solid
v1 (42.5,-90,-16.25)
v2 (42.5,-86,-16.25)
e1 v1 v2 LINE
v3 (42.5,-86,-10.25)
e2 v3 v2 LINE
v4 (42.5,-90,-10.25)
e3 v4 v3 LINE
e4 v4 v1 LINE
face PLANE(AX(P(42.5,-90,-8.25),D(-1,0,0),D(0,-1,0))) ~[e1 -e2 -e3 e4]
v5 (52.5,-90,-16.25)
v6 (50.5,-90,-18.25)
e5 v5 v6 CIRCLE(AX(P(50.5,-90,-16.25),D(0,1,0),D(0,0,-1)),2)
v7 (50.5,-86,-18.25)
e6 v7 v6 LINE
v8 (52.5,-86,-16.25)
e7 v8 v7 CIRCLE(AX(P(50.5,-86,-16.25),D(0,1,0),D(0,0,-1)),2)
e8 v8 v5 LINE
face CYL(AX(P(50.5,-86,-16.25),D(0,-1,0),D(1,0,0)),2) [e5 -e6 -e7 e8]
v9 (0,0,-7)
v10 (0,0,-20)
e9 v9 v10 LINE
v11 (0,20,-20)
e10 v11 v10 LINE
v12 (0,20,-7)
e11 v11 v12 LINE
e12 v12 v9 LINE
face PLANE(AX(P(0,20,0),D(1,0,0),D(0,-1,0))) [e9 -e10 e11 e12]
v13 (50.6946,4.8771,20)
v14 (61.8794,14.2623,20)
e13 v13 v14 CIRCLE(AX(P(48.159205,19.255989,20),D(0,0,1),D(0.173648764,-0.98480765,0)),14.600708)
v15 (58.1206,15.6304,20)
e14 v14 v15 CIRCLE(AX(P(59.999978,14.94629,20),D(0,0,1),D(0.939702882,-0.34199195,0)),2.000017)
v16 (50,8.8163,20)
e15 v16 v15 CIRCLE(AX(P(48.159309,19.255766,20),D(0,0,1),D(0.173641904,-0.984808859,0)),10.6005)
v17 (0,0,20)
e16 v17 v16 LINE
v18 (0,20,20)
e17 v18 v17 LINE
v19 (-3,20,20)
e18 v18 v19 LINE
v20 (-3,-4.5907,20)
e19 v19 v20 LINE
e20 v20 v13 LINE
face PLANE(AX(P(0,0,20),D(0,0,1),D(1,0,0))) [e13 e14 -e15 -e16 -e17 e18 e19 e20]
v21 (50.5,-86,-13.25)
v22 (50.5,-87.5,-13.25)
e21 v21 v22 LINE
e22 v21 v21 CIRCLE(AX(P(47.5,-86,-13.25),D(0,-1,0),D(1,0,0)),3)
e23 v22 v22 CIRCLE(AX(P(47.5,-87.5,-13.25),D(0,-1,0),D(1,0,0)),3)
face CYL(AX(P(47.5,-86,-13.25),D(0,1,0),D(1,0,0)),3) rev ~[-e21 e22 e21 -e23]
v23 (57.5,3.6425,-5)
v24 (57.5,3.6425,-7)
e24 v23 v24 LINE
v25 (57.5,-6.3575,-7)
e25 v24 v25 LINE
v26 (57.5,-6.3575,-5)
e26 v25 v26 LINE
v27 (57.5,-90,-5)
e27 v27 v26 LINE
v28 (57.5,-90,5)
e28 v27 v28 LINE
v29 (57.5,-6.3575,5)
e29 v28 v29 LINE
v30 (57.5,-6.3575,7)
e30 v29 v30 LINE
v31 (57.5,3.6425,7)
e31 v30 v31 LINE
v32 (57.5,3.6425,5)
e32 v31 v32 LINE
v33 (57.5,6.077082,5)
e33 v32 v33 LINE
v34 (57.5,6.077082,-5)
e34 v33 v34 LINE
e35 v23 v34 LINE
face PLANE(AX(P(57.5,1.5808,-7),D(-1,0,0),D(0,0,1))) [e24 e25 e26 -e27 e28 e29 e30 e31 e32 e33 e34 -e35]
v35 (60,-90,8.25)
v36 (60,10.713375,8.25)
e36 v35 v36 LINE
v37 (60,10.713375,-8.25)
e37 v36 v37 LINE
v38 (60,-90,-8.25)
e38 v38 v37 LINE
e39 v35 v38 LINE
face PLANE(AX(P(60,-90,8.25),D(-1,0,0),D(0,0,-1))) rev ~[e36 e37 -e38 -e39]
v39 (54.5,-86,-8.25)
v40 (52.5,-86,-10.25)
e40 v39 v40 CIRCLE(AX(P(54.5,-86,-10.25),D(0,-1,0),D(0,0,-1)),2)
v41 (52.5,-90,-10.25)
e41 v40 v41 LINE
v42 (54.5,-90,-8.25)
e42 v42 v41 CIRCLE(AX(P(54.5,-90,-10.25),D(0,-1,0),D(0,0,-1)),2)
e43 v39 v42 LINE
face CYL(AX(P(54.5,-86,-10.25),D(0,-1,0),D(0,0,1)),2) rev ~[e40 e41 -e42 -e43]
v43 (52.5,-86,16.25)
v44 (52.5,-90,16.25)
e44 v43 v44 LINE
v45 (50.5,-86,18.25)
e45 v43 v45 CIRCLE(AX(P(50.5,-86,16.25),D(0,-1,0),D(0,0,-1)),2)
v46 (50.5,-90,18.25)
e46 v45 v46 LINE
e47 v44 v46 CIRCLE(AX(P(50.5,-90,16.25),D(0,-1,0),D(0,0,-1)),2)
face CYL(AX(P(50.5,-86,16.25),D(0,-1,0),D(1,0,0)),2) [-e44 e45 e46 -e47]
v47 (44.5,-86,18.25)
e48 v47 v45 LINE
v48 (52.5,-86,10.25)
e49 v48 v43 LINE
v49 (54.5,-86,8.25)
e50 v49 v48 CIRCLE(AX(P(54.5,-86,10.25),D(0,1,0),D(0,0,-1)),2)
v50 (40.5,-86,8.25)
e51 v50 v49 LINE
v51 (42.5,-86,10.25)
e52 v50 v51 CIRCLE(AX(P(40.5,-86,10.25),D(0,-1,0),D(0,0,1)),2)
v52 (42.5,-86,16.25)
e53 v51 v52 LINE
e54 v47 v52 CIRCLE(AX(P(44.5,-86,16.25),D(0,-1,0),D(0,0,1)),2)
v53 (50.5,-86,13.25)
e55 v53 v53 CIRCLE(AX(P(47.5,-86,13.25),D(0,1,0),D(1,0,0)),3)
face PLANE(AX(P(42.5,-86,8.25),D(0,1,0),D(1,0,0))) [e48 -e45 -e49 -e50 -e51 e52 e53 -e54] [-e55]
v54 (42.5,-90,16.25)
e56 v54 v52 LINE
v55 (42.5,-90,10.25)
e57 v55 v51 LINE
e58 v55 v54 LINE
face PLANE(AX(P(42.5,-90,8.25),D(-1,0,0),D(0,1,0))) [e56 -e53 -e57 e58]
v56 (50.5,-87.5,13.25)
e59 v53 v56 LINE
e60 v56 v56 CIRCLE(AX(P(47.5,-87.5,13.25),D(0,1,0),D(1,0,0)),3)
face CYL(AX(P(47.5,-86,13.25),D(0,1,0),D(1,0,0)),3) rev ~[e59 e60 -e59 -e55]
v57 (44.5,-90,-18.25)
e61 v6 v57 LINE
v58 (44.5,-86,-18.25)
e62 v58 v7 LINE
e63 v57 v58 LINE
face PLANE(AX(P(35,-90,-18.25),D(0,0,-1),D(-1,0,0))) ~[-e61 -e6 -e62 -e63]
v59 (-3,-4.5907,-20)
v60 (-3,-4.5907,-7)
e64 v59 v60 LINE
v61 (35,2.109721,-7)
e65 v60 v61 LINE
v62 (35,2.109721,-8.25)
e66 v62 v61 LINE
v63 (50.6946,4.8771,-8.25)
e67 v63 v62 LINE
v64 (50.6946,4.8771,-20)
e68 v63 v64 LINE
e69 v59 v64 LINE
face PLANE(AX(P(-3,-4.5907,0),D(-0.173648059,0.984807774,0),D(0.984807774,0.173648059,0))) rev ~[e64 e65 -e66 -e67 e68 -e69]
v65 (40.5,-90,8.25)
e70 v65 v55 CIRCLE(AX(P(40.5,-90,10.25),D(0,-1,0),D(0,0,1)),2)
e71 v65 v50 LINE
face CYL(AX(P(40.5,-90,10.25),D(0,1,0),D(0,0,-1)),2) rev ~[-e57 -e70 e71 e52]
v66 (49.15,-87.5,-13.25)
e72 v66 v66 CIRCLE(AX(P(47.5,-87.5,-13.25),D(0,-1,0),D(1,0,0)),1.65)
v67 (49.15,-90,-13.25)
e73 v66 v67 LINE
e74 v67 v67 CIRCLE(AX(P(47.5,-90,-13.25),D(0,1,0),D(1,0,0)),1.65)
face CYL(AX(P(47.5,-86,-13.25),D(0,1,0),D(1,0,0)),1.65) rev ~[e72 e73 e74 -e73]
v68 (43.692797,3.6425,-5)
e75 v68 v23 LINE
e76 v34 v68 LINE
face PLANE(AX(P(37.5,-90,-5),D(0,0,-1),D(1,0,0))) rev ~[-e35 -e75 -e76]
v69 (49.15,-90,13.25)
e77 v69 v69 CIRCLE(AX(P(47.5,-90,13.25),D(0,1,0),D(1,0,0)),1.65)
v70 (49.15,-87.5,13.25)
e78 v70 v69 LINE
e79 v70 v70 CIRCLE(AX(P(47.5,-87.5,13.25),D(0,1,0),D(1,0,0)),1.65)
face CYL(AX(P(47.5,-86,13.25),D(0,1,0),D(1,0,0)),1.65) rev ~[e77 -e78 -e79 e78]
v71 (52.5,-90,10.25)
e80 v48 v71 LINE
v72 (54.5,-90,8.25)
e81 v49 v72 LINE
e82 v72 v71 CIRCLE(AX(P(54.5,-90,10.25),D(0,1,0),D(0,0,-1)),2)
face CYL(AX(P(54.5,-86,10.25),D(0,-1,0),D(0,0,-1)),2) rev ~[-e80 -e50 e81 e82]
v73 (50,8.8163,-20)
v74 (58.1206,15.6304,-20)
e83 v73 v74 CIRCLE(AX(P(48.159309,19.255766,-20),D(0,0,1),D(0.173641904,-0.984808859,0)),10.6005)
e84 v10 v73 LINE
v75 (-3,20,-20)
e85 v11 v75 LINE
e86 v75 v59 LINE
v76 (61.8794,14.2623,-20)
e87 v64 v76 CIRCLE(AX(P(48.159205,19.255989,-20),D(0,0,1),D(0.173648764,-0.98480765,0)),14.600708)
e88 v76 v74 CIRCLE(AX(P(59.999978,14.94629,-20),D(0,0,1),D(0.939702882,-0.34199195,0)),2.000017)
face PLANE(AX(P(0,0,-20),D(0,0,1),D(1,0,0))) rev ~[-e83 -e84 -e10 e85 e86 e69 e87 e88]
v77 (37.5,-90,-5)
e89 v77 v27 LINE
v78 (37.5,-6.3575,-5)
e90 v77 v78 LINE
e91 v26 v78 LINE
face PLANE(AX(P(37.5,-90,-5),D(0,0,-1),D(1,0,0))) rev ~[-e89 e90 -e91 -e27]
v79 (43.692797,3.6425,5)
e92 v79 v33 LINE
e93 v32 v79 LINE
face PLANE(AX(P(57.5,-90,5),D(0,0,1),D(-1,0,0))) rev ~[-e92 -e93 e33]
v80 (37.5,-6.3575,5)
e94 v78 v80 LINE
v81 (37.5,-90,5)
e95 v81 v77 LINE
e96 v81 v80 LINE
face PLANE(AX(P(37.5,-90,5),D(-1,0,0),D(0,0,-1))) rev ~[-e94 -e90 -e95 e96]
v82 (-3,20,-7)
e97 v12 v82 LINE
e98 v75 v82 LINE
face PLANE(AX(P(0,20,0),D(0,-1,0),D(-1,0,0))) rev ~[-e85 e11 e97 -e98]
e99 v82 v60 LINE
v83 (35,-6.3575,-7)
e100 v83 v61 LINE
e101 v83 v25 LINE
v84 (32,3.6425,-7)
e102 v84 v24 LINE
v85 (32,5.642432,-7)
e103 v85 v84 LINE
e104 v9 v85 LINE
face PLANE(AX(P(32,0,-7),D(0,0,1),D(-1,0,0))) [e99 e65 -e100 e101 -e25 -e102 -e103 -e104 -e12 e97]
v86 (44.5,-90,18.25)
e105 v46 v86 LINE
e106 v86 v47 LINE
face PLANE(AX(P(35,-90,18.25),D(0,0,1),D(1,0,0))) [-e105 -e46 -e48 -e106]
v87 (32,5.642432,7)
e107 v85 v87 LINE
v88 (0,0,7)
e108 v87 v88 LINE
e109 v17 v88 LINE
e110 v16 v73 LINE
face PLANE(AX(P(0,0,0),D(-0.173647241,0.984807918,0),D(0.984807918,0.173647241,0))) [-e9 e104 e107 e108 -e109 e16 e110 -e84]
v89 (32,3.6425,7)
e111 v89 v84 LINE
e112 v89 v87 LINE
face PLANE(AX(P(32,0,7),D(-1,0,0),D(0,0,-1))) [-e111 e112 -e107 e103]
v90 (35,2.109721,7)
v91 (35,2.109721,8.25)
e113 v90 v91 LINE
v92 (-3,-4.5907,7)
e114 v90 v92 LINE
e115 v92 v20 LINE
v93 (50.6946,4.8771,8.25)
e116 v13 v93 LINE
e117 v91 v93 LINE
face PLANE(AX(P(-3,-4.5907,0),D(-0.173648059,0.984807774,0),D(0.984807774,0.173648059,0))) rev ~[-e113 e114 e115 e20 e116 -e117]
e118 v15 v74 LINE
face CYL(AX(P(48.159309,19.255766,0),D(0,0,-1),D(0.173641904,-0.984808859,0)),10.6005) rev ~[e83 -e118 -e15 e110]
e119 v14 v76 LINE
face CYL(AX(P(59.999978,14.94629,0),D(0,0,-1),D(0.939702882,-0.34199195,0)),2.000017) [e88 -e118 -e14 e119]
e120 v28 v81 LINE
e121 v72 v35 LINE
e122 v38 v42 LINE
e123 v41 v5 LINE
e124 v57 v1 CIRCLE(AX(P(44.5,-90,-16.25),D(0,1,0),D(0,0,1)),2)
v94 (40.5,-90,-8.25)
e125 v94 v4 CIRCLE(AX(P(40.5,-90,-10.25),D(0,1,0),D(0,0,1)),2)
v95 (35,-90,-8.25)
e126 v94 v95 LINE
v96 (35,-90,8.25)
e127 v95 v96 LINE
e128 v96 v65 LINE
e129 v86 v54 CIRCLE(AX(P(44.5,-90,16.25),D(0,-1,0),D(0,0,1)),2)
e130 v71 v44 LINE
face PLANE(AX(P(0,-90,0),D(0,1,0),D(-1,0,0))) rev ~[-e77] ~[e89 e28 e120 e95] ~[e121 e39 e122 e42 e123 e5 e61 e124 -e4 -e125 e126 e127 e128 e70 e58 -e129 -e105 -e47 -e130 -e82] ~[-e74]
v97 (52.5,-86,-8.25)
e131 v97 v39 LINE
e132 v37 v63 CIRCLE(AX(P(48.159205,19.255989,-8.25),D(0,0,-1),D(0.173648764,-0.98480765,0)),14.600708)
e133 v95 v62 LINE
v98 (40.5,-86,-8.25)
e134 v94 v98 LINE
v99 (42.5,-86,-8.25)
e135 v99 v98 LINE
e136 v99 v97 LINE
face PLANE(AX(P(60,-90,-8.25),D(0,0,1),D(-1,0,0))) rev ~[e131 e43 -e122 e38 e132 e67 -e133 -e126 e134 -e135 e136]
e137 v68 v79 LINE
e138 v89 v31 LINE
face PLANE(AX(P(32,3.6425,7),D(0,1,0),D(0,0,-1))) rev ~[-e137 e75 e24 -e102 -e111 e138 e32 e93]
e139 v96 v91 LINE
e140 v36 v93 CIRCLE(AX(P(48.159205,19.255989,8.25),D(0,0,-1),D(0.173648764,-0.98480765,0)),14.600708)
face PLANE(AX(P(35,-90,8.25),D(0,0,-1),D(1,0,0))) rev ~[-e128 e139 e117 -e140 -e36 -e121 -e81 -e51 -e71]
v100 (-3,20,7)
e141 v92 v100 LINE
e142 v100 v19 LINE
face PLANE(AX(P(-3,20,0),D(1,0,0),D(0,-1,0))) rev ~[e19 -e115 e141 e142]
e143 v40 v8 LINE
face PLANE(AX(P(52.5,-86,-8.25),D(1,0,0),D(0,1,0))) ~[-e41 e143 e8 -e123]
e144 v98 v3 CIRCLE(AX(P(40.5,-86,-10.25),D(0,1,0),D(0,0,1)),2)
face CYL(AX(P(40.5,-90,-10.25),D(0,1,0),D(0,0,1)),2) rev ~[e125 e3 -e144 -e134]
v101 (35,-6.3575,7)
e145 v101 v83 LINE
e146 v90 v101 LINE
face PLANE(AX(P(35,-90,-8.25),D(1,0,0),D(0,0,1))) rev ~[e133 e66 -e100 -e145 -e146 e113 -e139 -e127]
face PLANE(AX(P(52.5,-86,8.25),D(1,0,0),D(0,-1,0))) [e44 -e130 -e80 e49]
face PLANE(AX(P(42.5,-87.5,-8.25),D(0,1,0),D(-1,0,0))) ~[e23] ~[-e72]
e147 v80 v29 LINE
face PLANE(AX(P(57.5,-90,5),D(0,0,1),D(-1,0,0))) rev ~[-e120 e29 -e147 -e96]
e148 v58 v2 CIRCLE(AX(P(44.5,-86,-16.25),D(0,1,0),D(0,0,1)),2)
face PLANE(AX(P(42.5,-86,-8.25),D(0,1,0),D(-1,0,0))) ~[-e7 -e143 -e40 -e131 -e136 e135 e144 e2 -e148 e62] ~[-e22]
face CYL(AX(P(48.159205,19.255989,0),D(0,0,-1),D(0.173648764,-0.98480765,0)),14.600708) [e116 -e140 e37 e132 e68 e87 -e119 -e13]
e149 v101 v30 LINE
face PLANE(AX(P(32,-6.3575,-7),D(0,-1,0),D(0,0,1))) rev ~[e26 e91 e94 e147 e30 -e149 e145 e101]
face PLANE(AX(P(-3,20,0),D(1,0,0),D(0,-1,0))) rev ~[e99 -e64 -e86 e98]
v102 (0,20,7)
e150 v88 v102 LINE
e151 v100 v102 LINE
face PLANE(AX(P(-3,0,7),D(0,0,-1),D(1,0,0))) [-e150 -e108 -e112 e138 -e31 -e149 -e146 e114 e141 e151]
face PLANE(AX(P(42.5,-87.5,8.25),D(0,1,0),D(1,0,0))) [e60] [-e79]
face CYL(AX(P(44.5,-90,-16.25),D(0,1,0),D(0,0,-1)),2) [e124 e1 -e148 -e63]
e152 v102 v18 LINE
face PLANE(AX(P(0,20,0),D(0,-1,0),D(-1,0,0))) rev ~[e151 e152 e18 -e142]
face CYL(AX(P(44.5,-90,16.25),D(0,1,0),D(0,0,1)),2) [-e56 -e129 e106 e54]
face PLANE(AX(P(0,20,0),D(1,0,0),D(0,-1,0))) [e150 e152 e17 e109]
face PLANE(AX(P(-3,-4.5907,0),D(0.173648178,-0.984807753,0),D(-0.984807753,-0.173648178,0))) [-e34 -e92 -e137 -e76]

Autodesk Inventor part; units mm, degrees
ref_plane "YZ Plane" through (0, 0, 0) normal (1, 0, 0) x (0, 1, 0)
sketch "Sketch1" plane through (0, 0, 0) normal (0, 0, 1) x (1, 0, 0)
  line L0 (0, 20) -> (0, 0)
  line L1 (0, 0) -> (50, 8.8163)
  arc A0 (50, 8.8163) -> (58.1206, 15.6304) centre (48.1592, 19.256) ccw
  line L2 (0, 0) -> (58.1206, 0) construction
  line L3 (58.1206, 15.6304) -> (52.4316, 0) construction
  line L4 (0, 20) -> (-3, 20)
  line L5 (-3, 20) -> (-3, -4.5907)
  line L6 (-3, -4.5907) -> (50.6946, 4.8771)
  arc A1 (50.6946, 4.8771) -> (61.8794, 14.2623) centre (48.1592, 19.256) ccw
  arc A2 (61.8794, 14.2623) -> (58.1206, 15.6304) centre (60, 14.9463) ccw
  dimension "d1" = 20
  dimension "d2" = 50
  dimension "d3" = 3
  dimension "d4" = 70
  dimension "d5" = 2
  dimension "d6" = 10
  dimension "d7" = 10
extrude "Extrusion1" add sketch "Sketch1" along normal mid plane 40
sketch "Sketch2" plane through (0, 0, 0) normal (0, 1, 0) x (-1, 0, 0)
  line L0 (3, 7) -> (-32, 7)
  line L1 (-32, 7) -> (-32, -7)
  line L2 (-32, -7) -> (3, -7)
  line L3 (3, -7) -> (3, 7)
  line L4 (3, -20) -> (3, 20) projected
  point P0 (0, 0)
  point P1 (3, 0)
  point P2 (3, 0)
  dimension "d10" = 14
  dimension "d11" = 35
extrude "Extrusion2" cut sketch "Sketch2" along normal through all both and the other way through all
ref_plane "Work Plane1" through (0, -90, 0) normal (0, 1, 0) x (-1, 0, 0)
sketch "Sketch3" plane through (0, -90, 0) normal (0, 1, 0) x (-1, 0, 0)
  line L0 (-60, -8.25) -> (-35, -8.25)
  line L1 (-35, -8.25) -> (-35, 8.25)
  line L2 (-35, 8.25) -> (-60, 8.25)
  line L3 (-60, 8.25) -> (-60, -8.25)
  line L4 (-60, -8.25) -> (-35, 8.25) construction
  line L5 (-35, -8.25) -> (-60, 8.25) construction
  line L6 (-32, -7) -> (-32, 7) projected
  point P0 (0, 0)
  point P1 (-47.5, 0)
  dimension "d27" = 25
  dimension "d28" = 16.5
  dimension "d29" = 3
extrude "Extrusion3" add sketch "Sketch3" along normal up to next
sketch "Sketch5" plane through (42, -90, 0) normal (0, -1, 0) x (1, 0, 0)
  line L0 (15.5, 5) -> (-4.5, 5)
  line L1 (-4.5, 5) -> (-4.5, -5)
  line L2 (-4.5, -5) -> (15.5, -5)
  line L3 (15.5, -5) -> (15.5, 5)
  line L4 (15.5, 5) -> (-4.5, -5) construction
  line L5 (-4.5, 5) -> (15.5, -5) construction
  line L6 (-7, 8.25) -> (18, 8.25) projected
  line L7 (18, 8.25) -> (18, -8.25) projected
  point P0 (-42, 0)
  point P1 (5.5, 0)
  point P2 (5.5, 8.25)
  point P3 (5.5, 5)
  point P4 (18, 0)
  point P5 (15.5, 0)
  dimension "d30" = 20
  dimension "d31" = 10
extrude "Extrusion4" cut sketch "Sketch5" against normal up to surface surface through (-3, -4.5907, 0) normal (0.1736482, -0.9848078, 0)
ref_plane "Work Plane2" through (-3, 20, 0) normal (0, 0, 1) x (1, 0, 0)
sketch "Sketch7" plane through (32, 1.5808, -7) normal (-1, 0, 0) x (0, 0, 1)
  line L0 (0, -7.9383) -> (14, -7.9383)
  line L1 (14, -7.9383) -> (14, 2.0617)
  line L2 (14, 2.0617) -> (0, 2.0617)
  line L3 (0, 2.0617) -> (0, -7.9383)
  line L4 (0, -7.9383) -> (14, 2.0617) construction
  line L5 (14, -7.9383) -> (0, 2.0617) construction
  line L6 (0, 4.0617) -> (14, 4.0617) projected
  point P0 (7, -1.5808)
  point P1 (7, -2.9383)
  point P2 (7, 4.0617)
  point P3 (7, 2.0617)
  dimension "d32" = 10
  dimension "d33" = 14
  dimension "d34" = 2
extrude "Extrusion5" cut sketch "Sketch7" against normal up to surface (25.5 mm away)
sketch "Sketch8" plane through (35, -90, 8.25) normal (0, 0, 1) x (1, 0, 0)
  line L0 (7.5, 4) -> (17.5, 4)
  line L1 (17.5, 4) -> (17.5, 0)
  line L2 (17.5, 0) -> (7.5, 0)
  line L3 (7.5, 0) -> (7.5, 4)
  line L4 (7.5, 4) -> (17.5, 0) construction
  line L5 (17.5, 4) -> (7.5, 0) construction
  line L6 (0, 0) -> (25, 0) projected
  point P0 (-35, 90)
  point P1 (12.5, 2)
  point P2 (12.5, 0)
  point P3 (12.5, 0)
  dimension "d37" = 10
  dimension "d38" = 4
extrude "Extrusion6" add sketch "Sketch8" along normal blind 10
sketch "Sketch9" plane through (42.5, -86, 8.25) normal (0, 1, 0) x (1, 0, 0)
  circle A0 centre (5, -5) radius 1.65
  circle A1 centre (5, -5) radius 3
  line L0 (10, 0) -> (10, -10) projected
  line L1 (10, -10) -> (0, -10) projected
  point P0 (-42.5, 8.25)
  point P1 (10, -5)
  point P2 (5, -10)
  dimension "d41" = 3.3
  dimension "d42" = 6
extrude "Extrusion7" cut sketch "Sketch9" against normal through all contours A0
extrude "Extrusion8" cut sketch "Sketch9" against normal blind 1.5
fillet "Fillet1" radius 2 4 edges at (52.5, -88, 18.25) (42.5, -88, 18.25) (52.5, -88, 8.25) (42.5, -88, 8.25)
mirror "Mirror1" about plane through (0, 0, 0) normal (0, 0, 1) of "Extrusion6", "Extrusion7", "Extrusion8", "Fillet1"
fillet_without_effect "Fillet2"
properties part number "Inclined Ramp"
